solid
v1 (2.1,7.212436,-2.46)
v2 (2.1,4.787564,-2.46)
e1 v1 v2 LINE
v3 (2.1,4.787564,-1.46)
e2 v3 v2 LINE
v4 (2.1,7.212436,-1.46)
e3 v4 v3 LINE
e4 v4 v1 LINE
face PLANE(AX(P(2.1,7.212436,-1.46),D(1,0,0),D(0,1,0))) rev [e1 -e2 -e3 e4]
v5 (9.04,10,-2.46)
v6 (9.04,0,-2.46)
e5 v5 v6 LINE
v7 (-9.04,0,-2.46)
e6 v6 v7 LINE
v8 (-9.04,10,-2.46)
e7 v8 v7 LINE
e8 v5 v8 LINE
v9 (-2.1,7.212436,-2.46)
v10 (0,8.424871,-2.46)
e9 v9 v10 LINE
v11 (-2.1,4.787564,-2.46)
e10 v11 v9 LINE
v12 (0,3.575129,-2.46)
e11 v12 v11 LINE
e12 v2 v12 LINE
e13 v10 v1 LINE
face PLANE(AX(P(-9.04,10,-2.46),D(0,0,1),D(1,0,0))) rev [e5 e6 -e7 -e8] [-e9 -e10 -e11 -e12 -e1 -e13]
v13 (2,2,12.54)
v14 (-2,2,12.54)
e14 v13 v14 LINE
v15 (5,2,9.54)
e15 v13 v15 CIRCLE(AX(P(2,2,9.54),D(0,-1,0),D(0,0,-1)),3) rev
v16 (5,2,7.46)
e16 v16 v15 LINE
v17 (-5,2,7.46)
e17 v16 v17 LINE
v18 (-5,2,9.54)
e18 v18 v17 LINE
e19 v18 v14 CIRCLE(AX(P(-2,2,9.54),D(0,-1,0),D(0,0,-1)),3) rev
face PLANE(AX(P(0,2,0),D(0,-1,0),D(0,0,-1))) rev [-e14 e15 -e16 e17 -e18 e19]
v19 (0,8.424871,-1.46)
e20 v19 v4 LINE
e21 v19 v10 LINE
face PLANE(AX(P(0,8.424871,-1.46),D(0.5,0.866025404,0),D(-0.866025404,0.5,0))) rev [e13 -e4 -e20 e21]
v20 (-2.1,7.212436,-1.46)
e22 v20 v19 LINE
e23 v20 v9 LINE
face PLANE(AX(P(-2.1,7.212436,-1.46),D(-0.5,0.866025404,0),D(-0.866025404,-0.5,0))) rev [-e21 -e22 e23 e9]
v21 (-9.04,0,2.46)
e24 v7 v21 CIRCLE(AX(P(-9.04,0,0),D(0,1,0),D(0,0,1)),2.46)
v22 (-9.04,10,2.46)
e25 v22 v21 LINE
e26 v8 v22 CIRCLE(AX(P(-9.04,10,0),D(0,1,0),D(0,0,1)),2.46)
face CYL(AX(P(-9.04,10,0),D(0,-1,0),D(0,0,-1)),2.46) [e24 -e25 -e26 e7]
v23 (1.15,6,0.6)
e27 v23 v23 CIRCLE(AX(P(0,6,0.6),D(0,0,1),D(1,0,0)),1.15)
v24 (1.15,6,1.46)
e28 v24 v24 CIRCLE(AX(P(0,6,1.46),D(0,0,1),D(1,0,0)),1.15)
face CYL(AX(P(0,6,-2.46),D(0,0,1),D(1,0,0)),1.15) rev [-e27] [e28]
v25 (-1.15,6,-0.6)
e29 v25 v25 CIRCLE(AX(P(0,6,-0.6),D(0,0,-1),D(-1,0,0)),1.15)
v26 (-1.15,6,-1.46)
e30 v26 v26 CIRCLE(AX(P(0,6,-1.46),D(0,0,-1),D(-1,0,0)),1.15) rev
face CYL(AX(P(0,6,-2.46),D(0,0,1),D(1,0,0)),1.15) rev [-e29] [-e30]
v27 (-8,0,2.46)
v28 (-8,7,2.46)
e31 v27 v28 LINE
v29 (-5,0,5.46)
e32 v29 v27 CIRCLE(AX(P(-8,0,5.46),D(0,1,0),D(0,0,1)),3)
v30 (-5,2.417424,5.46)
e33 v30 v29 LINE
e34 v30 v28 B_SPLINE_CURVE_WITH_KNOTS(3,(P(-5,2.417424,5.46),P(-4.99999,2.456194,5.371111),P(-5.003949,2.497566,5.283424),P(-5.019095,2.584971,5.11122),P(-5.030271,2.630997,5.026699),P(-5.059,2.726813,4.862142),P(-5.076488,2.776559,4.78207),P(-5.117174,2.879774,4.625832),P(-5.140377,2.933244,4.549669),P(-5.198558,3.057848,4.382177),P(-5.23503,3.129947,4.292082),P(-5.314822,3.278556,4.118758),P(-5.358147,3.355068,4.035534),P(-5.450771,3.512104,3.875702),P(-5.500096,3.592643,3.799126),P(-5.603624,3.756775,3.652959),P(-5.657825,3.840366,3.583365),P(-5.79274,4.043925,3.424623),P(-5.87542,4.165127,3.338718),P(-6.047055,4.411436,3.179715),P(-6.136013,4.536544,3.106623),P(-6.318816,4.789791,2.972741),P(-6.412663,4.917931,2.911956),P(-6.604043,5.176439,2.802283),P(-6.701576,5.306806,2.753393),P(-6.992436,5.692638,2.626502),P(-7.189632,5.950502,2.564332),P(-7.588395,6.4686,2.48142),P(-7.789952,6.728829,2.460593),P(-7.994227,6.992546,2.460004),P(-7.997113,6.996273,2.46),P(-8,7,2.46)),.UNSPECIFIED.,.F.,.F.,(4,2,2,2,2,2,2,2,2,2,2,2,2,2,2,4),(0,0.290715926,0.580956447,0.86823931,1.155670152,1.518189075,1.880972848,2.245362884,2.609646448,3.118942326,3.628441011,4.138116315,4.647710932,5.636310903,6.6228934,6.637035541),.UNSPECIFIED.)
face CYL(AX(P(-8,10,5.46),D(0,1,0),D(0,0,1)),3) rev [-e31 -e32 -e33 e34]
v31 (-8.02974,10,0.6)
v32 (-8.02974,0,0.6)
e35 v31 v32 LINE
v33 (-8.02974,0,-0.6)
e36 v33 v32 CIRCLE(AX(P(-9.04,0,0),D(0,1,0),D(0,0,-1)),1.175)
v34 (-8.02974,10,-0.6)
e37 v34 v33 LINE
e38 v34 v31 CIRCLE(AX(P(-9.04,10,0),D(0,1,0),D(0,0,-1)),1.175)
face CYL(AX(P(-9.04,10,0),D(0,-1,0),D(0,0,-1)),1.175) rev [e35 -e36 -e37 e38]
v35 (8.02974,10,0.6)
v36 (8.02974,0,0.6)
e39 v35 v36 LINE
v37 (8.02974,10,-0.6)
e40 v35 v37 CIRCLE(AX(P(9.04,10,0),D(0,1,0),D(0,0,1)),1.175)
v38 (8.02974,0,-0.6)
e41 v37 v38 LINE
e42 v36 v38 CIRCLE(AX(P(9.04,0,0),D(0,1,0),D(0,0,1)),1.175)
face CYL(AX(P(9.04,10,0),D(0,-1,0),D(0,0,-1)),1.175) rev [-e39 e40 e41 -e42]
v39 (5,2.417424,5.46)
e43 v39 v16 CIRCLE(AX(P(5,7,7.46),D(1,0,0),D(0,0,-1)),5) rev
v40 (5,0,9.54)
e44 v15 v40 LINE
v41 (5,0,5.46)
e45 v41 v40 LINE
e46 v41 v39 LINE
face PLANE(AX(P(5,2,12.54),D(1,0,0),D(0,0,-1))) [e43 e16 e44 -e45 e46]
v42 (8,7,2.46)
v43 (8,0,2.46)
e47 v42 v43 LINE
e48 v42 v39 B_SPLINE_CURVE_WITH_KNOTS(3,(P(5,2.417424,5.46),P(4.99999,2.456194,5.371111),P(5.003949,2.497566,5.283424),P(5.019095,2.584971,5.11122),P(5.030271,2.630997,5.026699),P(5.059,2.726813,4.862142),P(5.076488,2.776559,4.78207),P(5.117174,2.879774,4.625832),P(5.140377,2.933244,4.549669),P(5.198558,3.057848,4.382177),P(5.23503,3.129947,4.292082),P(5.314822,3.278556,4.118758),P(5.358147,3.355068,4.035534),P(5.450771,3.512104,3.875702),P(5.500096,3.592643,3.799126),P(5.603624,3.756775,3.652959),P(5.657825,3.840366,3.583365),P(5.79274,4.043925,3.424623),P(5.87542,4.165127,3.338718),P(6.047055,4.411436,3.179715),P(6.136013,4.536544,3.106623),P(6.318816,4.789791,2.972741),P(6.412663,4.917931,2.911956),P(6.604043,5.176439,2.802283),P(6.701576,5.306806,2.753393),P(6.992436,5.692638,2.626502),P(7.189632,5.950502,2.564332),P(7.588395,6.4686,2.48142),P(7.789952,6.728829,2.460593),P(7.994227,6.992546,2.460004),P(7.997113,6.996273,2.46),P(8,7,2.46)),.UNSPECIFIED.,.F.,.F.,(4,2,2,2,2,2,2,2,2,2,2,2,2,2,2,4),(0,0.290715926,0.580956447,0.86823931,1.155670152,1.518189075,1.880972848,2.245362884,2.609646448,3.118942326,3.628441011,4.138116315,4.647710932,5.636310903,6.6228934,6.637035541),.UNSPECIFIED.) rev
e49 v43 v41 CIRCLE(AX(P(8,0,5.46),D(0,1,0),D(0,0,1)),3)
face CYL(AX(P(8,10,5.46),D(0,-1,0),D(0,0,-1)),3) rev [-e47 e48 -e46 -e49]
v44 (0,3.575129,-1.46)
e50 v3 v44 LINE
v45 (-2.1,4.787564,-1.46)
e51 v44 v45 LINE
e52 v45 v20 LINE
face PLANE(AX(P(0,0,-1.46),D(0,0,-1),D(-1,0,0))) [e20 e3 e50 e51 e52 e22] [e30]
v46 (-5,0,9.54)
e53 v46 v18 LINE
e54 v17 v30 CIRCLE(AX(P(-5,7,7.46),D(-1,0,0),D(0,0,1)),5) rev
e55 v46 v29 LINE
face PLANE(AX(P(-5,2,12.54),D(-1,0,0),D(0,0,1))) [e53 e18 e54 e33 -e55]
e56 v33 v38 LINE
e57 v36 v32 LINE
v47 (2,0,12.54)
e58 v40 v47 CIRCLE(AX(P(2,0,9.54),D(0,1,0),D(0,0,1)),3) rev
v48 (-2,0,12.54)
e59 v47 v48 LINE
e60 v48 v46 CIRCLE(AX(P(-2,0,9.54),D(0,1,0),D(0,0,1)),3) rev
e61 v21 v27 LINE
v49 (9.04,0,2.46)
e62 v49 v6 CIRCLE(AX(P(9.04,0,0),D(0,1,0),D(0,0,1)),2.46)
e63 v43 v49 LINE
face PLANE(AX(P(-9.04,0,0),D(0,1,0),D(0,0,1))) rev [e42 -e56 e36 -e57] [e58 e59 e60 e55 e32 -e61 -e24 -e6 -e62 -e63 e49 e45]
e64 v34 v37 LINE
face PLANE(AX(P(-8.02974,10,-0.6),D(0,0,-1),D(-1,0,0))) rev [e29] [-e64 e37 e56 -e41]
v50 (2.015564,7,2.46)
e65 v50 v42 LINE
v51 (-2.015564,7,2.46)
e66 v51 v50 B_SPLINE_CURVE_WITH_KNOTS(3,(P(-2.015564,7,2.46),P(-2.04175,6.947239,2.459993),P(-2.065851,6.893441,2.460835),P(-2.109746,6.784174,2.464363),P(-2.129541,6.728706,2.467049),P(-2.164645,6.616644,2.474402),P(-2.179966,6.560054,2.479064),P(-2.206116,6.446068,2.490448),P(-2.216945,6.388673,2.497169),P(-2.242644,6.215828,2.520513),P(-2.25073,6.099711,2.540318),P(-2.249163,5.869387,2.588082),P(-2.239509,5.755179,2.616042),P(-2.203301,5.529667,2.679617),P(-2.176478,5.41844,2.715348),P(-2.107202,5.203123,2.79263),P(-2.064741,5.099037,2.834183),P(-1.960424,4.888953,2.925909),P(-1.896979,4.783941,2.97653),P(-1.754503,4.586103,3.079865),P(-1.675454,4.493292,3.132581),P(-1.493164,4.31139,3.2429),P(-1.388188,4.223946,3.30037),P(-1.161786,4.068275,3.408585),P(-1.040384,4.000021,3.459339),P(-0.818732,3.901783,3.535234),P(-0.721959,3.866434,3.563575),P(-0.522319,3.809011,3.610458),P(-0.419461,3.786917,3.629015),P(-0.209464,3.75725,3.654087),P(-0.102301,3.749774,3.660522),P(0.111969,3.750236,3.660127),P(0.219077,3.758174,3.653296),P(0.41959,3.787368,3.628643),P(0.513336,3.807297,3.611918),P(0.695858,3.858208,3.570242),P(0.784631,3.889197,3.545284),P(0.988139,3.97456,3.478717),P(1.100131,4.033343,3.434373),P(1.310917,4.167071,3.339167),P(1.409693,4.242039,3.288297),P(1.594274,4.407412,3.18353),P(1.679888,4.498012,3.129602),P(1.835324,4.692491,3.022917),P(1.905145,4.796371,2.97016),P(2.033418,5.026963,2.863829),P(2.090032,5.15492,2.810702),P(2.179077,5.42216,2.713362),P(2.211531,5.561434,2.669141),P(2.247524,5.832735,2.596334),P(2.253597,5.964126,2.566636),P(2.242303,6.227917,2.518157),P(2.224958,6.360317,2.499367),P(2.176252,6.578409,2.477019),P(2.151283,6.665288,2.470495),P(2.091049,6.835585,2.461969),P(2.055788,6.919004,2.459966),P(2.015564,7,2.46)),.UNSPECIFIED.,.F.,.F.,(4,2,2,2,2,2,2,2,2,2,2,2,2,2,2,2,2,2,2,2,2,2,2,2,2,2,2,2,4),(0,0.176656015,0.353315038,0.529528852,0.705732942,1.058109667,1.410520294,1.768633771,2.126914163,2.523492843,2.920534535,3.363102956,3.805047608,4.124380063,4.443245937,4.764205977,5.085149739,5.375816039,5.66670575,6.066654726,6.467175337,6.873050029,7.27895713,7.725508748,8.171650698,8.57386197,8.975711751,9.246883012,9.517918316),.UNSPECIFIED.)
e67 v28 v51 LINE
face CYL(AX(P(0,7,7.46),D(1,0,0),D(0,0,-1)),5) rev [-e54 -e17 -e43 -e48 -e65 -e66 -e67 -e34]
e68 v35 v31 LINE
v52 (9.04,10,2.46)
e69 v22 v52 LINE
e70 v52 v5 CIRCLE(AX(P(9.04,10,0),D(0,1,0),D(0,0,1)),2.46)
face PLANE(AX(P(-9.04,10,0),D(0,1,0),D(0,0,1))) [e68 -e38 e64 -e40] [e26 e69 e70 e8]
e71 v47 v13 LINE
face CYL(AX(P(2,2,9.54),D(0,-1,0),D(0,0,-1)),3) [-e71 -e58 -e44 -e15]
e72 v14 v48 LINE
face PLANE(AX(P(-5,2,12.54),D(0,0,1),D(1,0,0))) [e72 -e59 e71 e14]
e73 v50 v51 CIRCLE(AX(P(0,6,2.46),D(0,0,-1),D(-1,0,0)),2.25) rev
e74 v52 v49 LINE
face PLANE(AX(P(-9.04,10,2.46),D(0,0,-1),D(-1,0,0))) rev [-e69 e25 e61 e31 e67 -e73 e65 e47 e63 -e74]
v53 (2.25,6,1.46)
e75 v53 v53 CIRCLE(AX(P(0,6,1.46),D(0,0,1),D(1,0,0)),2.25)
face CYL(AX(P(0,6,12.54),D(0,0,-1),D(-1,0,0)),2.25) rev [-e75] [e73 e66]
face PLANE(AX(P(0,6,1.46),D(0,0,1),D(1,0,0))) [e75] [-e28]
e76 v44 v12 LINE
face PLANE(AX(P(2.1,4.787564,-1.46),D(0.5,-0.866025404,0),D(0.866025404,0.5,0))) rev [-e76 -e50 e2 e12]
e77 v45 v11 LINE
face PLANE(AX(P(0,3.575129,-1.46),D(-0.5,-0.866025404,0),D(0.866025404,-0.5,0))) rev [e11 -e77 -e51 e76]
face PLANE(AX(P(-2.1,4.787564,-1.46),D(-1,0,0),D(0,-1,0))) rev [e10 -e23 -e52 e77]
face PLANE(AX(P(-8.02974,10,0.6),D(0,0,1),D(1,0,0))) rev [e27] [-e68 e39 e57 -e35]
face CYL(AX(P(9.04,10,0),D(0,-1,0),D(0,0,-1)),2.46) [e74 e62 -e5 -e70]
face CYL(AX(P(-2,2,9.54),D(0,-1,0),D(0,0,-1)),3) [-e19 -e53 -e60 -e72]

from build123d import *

# Parameters (mm, degrees)
SKETCH_1_R               = 1.175
EXTRUDE_1_DEPTH          = 10
SKETCH_3_W               = 10
SKETCH_3_H               = 15
EXTRUDE_2_DEPTH          = 2
FILLET_2_R               = 3
FILLET_START             = -5
FILLET_3_DEPTH           = 10
FILLET_START_2           = 2
FILLET_3_2_DEPTH         = 4.9438
FILLET_START_3           = -9
FILLET_3_3_DEPTH         = 17
SKETCH_4_W               = 16.05948
SKETCH_4_H               = 1.2
CUT_EXTRUDE_2_DEPTH      = 20.735795
CUT_EXTRUDE_4_DEPTH      = 19.271738
CUT_EXTRUDE_4_DEPTH_BACK = 1
SKETCH_6_R               = 2.25
SKETCH_7_R               = 1.15
CUT_EXTRUDE_5_DEPTH      = 19.841879
CUT_EXTRUDE_6_DEPTH      = 1


with BuildPart() as part:
    # 草图1 → 凸台-拉伸1 (new body)
    with BuildSketch(Plane(origin=(0, 0, 0), x_dir=(1, 0, 0), z_dir=(0, 1, 0))):
        with BuildLine():
            Line((-9.04, 2.46), (9.04, 2.46))
            ThreePointArc((9.04, 2.46), (11.5, 0), (9.04, -2.46))
            Line((9.04, -2.46), (-9.04, -2.46))
            ThreePointArc((-9.04, -2.46), (-11.5, 0), (-9.04, 2.46))
        make_face()
        with Locations(Location((9.04, 0, 0), (0, 0, 270))):
            Circle(SKETCH_1_R, mode=Mode.SUBTRACT)
        with Locations(Location((-9.04, 0, 0), (0, 0, 90))):
            Circle(SKETCH_1_R, mode=Mode.SUBTRACT)
    extrude(amount=EXTRUDE_1_DEPTH)

    # 草图3 → 凸台-拉伸2 (add)
    with BuildSketch(Plane.XZ):
        with Locations((0, 5.04)):
            Rectangle(SKETCH_3_W, SKETCH_3_H)
    extrude(amount=-EXTRUDE_2_DEPTH)

    # 圆角2
    fillet_2_edges = [part.edges().sort_by_distance(p)[0] for p in [
        (5, 1, 12.54),
        (5, 1, 2.46),
        (-5, 1, 2.46),
        (-5, 1, 12.54),
    ]]
    fillet(fillet_2_edges, radius=FILLET_2_R)

    # 圆角3: read off the stored shape, not the designer's step
    # 圆角3 outline → 圆角3 (add)
    with BuildSketch(Plane.YZ.offset(FILLET_START)):
        with BuildLine():
            ThreePointArc((7, 2.46), (3.464466, 3.924466), (2, 7.46))
            Line((2, 7.46), (2, 2.46))
            Line((2, 2.46), (7, 2.46))
        make_face()
    extrude(amount=FILLET_3_DEPTH)

    # Fillet 3 2 outline → Fillet 3 2 (add)
    with BuildSketch(Plane(origin=(0, 0, 0), x_dir=(1, 0, 0), z_dir=(0, 1, 0)).offset(FILLET_START_2)):
        with BuildLine():
            Line((5, -2.46), (5, -5.46))
            ThreePointArc((5, -5.46), (5.87868, -3.33868), (8, -2.46))
            Line((8, -2.46), (5, -2.46))
        make_face()
        with BuildLine():
            Line((-5, -5.46), (-5, -2.46))
            Line((-5, -2.46), (-8, -2.46))
            ThreePointArc((-8, -2.46), (-5.87868, -3.33868), (-5, -5.46))
        make_face()
    extrude(amount=FILLET_3_2_DEPTH)

    # Fillet 3 3 outline → Fillet 3 3 (cut)
    with BuildSketch(Plane.YZ.offset(FILLET_START_3)):
        with BuildLine():
            Line((8, 7), (2.021205, 7))
            ThreePointArc((2.021205, 7), (3.610313, 3.784402), (6.9438, 2.460316))
            ThreePointArc((6.9438, 2.460316), (6.9719, 2.460079), (7, 2.46))
            Line((7, 2.46), (8, 2.46))
            Line((8, 2.46), (8, 7))
        make_face()
    extrude(amount=FILLET_3_3_DEPTH, mode=Mode.SUBTRACT)

    # 草图4 → 切除-拉伸2 (cut, through all)
    with BuildSketch(Plane.XZ):
        Rectangle(SKETCH_4_W, SKETCH_4_H)
    extrude(amount=-CUT_EXTRUDE_2_DEPTH, mode=Mode.SUBTRACT)

    # 草图6 → 切除-拉伸4 (cut, two sides: drawn at the far end of the back side and taken through both)
    with BuildSketch(Plane.XY.offset(2.46).offset(-CUT_EXTRUDE_4_DEPTH_BACK)):
        with Locations(Location((0, 6, 0), (0, 0, 153.6122))):
            Circle(SKETCH_6_R)
    extrude(amount=CUT_EXTRUDE_4_DEPTH + CUT_EXTRUDE_4_DEPTH_BACK, mode=Mode.SUBTRACT)

    # 草图7 → 切除-拉伸5 (cut, through all)
    with BuildSketch(Plane.XY.offset(1.46)):
        with Locations((0, 6)):
            Circle(SKETCH_7_R)
    extrude(amount=-CUT_EXTRUDE_5_DEPTH, mode=Mode.SUBTRACT)

    # 草图8 → 切除-拉伸6 (cut)
    with BuildSketch(Plane(origin=(0, 0, -2.46), x_dir=(-1, 0, 0), z_dir=(0, 0, -1))):
        Polygon((0, 8.424871), (-2.1, 7.212436), (-2.1, 4.787564), (0, 3.575129), (2.1, 4.787564), (2.1, 7.212436), align=None)
    extrude(amount=-CUT_EXTRUDE_6_DEPTH, mode=Mode.SUBTRACT)


solid = part.part
